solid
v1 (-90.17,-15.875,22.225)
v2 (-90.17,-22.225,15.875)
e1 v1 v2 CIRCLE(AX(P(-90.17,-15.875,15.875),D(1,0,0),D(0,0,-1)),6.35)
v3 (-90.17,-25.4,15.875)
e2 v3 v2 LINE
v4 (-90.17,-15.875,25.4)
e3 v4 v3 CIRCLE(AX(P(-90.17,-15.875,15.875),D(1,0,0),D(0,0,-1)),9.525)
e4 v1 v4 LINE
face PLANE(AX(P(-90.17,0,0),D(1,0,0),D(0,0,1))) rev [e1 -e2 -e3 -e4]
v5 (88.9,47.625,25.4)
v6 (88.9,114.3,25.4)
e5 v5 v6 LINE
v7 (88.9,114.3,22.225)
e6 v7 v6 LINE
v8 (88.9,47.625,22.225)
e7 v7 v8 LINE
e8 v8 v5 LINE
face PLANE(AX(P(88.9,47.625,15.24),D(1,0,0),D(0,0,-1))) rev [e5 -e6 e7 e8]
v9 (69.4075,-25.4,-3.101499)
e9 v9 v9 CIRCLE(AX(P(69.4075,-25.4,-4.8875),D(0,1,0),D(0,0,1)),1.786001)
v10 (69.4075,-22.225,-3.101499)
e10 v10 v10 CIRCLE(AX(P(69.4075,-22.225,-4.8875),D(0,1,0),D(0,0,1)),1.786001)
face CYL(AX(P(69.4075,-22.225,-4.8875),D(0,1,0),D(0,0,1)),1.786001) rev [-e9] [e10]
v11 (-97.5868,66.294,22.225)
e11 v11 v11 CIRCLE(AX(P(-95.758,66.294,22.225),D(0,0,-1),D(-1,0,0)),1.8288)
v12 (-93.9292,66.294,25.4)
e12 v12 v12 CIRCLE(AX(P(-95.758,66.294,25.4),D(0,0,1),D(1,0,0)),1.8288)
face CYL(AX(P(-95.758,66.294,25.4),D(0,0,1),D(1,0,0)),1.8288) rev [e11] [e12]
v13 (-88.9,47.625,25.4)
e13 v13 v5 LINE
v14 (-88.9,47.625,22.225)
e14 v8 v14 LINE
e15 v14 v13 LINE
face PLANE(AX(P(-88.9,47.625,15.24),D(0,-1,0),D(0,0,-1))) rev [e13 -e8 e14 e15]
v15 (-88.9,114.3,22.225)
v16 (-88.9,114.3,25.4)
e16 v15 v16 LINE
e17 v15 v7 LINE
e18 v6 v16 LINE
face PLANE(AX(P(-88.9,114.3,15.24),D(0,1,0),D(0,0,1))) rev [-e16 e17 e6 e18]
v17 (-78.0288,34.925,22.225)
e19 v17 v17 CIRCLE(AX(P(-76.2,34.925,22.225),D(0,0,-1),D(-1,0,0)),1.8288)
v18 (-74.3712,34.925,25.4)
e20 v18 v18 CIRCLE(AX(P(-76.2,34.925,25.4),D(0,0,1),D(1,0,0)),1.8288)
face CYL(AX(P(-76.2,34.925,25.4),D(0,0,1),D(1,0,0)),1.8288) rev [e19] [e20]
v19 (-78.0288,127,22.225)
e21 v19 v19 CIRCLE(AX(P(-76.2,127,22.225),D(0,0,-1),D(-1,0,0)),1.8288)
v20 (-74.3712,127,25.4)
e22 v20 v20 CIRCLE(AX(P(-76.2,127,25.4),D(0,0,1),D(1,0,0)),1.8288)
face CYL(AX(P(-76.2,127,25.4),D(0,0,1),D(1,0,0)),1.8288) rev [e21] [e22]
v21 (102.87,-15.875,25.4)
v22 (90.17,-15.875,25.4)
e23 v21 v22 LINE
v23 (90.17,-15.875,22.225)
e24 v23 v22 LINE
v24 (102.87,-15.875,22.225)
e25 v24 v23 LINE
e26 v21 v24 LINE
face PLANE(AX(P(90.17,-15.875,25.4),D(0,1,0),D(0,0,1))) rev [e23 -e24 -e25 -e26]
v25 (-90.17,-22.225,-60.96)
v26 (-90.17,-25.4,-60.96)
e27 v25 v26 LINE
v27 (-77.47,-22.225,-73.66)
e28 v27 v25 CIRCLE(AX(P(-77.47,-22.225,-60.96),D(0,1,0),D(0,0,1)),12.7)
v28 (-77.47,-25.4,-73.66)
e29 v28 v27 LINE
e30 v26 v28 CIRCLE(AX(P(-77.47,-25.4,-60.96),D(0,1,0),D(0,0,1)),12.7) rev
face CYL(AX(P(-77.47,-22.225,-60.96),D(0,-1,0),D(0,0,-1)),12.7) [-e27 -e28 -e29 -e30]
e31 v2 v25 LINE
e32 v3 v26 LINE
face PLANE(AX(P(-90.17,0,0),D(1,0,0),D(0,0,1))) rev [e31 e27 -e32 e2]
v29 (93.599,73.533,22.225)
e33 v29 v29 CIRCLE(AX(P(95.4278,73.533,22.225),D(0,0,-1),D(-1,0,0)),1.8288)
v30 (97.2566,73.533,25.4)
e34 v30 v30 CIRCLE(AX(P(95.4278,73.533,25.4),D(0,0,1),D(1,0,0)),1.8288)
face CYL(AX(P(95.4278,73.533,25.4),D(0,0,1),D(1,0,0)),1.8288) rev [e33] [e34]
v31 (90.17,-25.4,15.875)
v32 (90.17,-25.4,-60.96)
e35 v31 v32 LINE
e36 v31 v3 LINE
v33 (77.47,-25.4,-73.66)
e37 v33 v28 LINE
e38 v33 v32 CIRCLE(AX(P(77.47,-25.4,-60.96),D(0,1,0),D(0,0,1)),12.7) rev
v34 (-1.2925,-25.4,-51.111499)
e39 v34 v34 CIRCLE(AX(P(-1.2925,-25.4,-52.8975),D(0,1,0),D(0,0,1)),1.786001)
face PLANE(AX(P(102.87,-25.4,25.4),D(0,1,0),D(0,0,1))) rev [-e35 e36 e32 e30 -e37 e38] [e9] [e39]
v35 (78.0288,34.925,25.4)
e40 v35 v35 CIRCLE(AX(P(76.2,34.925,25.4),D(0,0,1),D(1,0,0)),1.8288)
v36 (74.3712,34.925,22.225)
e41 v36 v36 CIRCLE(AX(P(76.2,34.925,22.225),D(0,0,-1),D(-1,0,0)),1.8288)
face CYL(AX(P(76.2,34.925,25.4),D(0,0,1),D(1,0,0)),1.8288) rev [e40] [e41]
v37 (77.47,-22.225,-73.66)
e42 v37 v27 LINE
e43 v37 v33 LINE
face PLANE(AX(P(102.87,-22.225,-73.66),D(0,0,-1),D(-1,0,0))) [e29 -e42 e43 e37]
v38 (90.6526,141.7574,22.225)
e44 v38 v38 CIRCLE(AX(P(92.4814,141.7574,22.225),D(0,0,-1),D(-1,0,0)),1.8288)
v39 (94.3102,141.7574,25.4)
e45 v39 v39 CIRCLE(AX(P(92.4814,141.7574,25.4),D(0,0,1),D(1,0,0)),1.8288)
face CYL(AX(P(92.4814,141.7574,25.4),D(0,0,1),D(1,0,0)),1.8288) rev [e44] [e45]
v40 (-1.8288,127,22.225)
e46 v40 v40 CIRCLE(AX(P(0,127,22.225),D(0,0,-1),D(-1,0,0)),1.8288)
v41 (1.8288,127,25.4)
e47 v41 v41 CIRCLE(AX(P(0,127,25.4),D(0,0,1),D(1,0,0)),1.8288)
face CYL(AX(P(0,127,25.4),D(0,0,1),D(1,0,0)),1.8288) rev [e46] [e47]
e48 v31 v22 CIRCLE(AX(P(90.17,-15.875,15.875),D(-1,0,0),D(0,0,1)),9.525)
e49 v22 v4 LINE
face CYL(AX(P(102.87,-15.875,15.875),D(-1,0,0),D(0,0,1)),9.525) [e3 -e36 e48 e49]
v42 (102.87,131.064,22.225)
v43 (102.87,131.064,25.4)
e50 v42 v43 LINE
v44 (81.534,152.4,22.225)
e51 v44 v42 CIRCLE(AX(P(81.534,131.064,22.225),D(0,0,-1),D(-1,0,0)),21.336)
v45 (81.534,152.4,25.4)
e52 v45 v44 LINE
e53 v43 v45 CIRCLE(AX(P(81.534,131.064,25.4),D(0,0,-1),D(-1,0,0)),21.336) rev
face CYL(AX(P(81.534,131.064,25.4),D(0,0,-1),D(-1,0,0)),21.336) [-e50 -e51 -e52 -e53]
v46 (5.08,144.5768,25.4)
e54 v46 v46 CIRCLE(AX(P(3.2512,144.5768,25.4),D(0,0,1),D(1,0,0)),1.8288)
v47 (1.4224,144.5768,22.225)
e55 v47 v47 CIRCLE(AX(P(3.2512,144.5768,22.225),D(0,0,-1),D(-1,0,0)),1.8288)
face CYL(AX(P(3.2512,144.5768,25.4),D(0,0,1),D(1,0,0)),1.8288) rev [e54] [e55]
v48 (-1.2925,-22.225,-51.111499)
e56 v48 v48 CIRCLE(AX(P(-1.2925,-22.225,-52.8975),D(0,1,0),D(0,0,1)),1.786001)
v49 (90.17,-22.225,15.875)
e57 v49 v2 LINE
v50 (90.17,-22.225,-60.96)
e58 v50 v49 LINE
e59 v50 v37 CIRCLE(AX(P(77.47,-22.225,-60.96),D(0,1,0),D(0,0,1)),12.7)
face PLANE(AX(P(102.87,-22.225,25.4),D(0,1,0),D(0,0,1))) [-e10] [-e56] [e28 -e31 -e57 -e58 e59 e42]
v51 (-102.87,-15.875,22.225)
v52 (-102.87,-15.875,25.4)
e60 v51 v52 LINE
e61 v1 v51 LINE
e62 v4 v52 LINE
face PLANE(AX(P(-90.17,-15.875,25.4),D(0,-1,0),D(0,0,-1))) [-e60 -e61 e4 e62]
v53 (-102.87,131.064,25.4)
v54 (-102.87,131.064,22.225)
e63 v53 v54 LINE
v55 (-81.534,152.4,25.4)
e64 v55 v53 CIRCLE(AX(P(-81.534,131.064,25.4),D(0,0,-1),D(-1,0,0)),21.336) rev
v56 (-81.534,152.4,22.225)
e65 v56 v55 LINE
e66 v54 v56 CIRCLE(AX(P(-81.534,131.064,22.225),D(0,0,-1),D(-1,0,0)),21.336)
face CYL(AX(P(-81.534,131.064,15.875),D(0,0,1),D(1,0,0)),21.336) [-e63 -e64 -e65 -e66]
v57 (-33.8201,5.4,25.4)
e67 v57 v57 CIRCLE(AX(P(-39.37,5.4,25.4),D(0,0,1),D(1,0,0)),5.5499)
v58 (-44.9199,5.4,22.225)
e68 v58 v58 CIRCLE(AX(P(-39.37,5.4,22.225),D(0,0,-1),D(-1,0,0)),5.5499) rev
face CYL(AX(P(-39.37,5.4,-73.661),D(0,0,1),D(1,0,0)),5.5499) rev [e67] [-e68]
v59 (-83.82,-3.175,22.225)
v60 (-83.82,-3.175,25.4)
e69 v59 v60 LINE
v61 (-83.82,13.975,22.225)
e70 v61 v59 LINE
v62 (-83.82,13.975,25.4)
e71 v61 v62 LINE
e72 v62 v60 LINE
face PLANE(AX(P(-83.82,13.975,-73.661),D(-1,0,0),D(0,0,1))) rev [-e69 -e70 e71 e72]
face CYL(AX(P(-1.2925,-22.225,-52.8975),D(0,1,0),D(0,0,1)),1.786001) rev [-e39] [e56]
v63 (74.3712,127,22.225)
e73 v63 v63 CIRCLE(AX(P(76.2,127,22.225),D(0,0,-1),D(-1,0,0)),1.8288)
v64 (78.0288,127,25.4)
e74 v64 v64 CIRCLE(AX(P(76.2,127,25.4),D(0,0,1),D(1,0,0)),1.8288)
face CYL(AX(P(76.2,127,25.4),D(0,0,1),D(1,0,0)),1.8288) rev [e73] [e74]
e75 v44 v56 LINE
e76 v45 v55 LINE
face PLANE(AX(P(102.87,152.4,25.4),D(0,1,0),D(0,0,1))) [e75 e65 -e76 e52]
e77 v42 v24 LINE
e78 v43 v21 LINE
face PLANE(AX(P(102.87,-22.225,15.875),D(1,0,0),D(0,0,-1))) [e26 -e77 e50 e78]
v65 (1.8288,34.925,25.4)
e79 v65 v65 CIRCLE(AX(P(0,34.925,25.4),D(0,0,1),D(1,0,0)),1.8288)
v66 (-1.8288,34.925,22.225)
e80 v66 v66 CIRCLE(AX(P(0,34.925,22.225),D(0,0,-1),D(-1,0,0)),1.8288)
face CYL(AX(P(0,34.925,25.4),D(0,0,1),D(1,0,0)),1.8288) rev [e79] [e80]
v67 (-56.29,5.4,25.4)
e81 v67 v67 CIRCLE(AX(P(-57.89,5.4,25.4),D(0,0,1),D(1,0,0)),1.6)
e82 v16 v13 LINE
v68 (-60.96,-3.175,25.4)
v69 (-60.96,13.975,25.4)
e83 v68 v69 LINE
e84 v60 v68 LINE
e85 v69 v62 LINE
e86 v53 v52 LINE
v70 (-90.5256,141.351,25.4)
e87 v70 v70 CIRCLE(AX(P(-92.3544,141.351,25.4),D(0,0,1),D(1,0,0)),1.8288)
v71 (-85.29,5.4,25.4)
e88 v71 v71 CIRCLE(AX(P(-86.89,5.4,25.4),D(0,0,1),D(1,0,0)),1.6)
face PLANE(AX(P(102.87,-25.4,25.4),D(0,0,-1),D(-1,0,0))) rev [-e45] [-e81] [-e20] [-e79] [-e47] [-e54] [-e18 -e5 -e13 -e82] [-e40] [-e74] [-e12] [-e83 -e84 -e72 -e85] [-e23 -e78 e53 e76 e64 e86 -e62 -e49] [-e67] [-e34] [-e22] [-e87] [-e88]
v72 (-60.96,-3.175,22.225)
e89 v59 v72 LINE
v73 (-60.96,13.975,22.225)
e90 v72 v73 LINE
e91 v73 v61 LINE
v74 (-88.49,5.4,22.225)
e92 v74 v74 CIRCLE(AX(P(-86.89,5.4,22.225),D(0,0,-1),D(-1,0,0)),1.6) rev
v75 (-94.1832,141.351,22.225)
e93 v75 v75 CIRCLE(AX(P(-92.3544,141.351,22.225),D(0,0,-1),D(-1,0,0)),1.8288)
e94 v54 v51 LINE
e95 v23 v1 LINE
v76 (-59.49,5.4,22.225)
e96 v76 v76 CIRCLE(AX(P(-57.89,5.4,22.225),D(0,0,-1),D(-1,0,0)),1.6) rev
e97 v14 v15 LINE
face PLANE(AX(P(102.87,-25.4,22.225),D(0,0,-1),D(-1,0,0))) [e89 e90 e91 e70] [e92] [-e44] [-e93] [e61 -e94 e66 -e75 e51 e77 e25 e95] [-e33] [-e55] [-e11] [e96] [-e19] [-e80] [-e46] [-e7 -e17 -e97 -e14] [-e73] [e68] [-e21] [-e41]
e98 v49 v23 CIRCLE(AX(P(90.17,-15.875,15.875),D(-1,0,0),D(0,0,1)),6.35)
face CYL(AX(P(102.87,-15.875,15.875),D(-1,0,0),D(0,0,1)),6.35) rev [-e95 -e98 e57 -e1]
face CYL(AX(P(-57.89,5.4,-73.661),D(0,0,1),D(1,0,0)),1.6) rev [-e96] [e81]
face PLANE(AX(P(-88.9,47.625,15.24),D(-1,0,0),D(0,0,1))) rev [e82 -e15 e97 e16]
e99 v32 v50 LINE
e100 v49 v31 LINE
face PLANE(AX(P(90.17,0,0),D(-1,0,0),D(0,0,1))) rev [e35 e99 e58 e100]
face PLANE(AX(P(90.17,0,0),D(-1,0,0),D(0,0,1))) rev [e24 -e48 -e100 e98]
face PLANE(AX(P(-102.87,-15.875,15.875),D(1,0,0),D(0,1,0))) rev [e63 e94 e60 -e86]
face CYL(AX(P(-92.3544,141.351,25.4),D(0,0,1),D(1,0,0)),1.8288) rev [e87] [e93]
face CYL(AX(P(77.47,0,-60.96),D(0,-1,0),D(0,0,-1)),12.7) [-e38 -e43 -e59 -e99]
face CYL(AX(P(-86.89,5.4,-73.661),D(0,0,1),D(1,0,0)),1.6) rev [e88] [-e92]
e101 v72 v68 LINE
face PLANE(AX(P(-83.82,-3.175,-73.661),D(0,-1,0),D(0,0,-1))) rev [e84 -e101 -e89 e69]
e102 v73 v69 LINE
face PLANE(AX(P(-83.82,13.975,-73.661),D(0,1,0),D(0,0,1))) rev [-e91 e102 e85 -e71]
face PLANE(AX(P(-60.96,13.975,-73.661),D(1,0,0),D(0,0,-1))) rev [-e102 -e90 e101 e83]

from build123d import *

# Parameters (mm, degrees)
BASE_FLANGE1_DEPTH              = 102.87
SKETCH6_W                       = 9.525
SKETCH6_H                       = 99.06
CUT_EXTRUDE1_DEPTH              = 12.7
FILLET1_R                       = 21.336
FILLET2_R                       = 12.7
SKETCH8_W                       = 177.8
SKETCH8_H                       = 66.675
CUT_EXTRUDE2_DEPTH              = 10.16
F_27_0_144_DIAMETER_HOLE1_D     = 3.6576
F_27_0_144_DIAMETER_HOLE2_D     = 3.6576
CUT_EXTRUDE3_REACH              = 210.856
SKETCH17_R                      = 1.6
SKETCH17_W                      = 22.86
SKETCH17_H                      = 17.15
CUT_EXTRUDE4_REACH              = 210.856
SKETCH18_R                      = 5.5499
F_9_64_0_14063_DIAMETER_HOLE1_D = 3.572002


# Sheet-metal steps are written as plain solids
with BuildPart() as part:
    # Sketch1 → Base-Flange1 (new, symmetric)
    with BuildSketch(Plane.YZ):
        with BuildLine():
            Line((-25.4, -73.66), (-25.4, 15.875))
            ThreePointArc((-25.4, 15.875), (-22.610192091, 22.610192091), (-15.875, 25.4))
            Line((-15.875, 25.4), (152.4, 25.4))
            Line((152.4, 25.4), (152.4, 22.225))
            Line((152.4, 22.225), (-15.875, 22.225))
            ThreePointArc((-15.875, 22.225), (-20.365128061, 20.365128061), (-22.225, 15.875))
            Line((-22.225, 15.875), (-22.225, -73.66))
            Line((-22.225, -73.66), (-25.4, -73.66))
        make_face()
    extrude(amount=BASE_FLANGE1_DEPTH, both=True)

    # Sketch6 → Cut-Extrude1 (cut)
    with BuildSketch(Plane.YZ.offset(102.87)):
        with Locations((-20.6375, -24.13)):
            Rectangle(SKETCH6_W, SKETCH6_H)
    cut_extrude1 = extrude(amount=-CUT_EXTRUDE1_DEPTH, mode=Mode.SUBTRACT)

    # Mirror1: Cut-Extrude1 across plane
    add(cut_extrude1.mirror(Plane(origin=(0, 0, 0), x_dir=(0, 0, 1), z_dir=(1, 0, 0))), mode=Mode.SUBTRACT)

    # Fillet1
    fillet1_edges = [part.edges().sort_by_distance(p)[0] for p in [
        (102.87, 152.4, 23.8125),
        (-102.87, 152.4, 23.8125),
    ]]
    fillet(fillet1_edges, radius=FILLET1_R)

    # Fillet2
    fillet2_edges = [part.edges().sort_by_distance(p)[0] for p in [
        (90.17, -23.8125, -73.66),
        (-90.17, -23.8125, -73.66),
    ]]
    fillet(fillet2_edges, radius=FILLET2_R)

    # Sketch8 → Cut-Extrude2 (cut)
    with BuildSketch(Plane.XY.offset(25.4)):
        with Locations((0, 80.9625)):
            Rectangle(SKETCH8_W, SKETCH8_H)
    extrude(amount=-CUT_EXTRUDE2_DEPTH, mode=Mode.SUBTRACT)

    # #27 (0.144) Diameter Hole1 (through all)
    with Locations(Plane.XY.offset(25.4)):
        with Locations((-76.2, 127), (0, 127), (76.2, 127), (76.2, 34.925), (0, 34.925), (-76.2, 34.925)):
            Hole(F_27_0_144_DIAMETER_HOLE1_D / 2)

    # #27 (0.144) Diameter Hole2 (through all)
    with Locations(Plane.XY.offset(25.4)):
        with Locations((92.4814, 141.7574), (95.4278, 73.533), (95.4278, -25.273), (-95.758, -18.034), (-95.758, 66.294), (-92.3544, 141.351), (3.2512, 144.5768)):
            Hole(F_27_0_144_DIAMETER_HOLE2_D / 2)

    # Sketch17 → Cut-Extrude3 (cut, up to next)
    with BuildSketch(Plane.XY.offset(25.4), mode=Mode.PRIVATE) as cut_extrude3_sk1:
        with Locations((-86.89, 5.4)):
            Circle(SKETCH17_R)
    cut_extrude3_tool1 = extrude(cut_extrude3_sk1.sketch, amount=-CUT_EXTRUDE3_REACH, mode=Mode.PRIVATE) & part.part
    # Sketch17 → Cut-Extrude3 (cut, up to next)
    with BuildSketch(Plane.XY.offset(25.4), mode=Mode.PRIVATE) as cut_extrude3_sk2:
        with Locations((-57.89, 5.4)):
            Circle(SKETCH17_R)
    cut_extrude3_tool2 = extrude(cut_extrude3_sk2.sketch, amount=-CUT_EXTRUDE3_REACH, mode=Mode.PRIVATE) & part.part
    # Sketch17 → Cut-Extrude3 (cut, up to next)
    with BuildSketch(Plane.XY.offset(25.4), mode=Mode.PRIVATE) as cut_extrude3_sk3:
        with Locations((-72.39, 5.4)):
            Rectangle(SKETCH17_W, SKETCH17_H)
    cut_extrude3_tool3 = extrude(cut_extrude3_sk3.sketch, amount=-CUT_EXTRUDE3_REACH, mode=Mode.PRIVATE) & part.part
    add(cut_extrude3_tool1.solids().sort_by_distance((-86.89, 5.4, 25.4))[0], mode=Mode.SUBTRACT)
    add(cut_extrude3_tool2.solids().sort_by_distance((-57.89, 5.4, 25.4))[0], mode=Mode.SUBTRACT)
    add(cut_extrude3_tool3.solids().sort_by_distance((-72.39, 5.4, 25.4))[0], mode=Mode.SUBTRACT)

    # Sketch18 → Cut-Extrude4 (cut, up to next)
    with BuildSketch(Plane.XY.offset(25.4), mode=Mode.PRIVATE) as cut_extrude4_sk1:
        with Locations((-39.37, 5.4)):
            Circle(SKETCH18_R)
    cut_extrude4_tool1 = extrude(cut_extrude4_sk1.sketch, amount=-CUT_EXTRUDE4_REACH, mode=Mode.PRIVATE) & part.part
    add(cut_extrude4_tool1.solids().sort_by_distance((-39.37, 5.4, 25.4))[0], mode=Mode.SUBTRACT)

    # 9/64 (0.14063) Diameter Hole1 (through all)
    with Locations(Plane(origin=(0, -22.225, 0), x_dir=(1, 0, 0), z_dir=(0, 1, 0))):
        with Locations((-1.292500082, 52.897499996), (69.407499996, 4.887500004)):
            Hole(F_9_64_0_14063_DIAMETER_HOLE1_D / 2)


solid = part.part
